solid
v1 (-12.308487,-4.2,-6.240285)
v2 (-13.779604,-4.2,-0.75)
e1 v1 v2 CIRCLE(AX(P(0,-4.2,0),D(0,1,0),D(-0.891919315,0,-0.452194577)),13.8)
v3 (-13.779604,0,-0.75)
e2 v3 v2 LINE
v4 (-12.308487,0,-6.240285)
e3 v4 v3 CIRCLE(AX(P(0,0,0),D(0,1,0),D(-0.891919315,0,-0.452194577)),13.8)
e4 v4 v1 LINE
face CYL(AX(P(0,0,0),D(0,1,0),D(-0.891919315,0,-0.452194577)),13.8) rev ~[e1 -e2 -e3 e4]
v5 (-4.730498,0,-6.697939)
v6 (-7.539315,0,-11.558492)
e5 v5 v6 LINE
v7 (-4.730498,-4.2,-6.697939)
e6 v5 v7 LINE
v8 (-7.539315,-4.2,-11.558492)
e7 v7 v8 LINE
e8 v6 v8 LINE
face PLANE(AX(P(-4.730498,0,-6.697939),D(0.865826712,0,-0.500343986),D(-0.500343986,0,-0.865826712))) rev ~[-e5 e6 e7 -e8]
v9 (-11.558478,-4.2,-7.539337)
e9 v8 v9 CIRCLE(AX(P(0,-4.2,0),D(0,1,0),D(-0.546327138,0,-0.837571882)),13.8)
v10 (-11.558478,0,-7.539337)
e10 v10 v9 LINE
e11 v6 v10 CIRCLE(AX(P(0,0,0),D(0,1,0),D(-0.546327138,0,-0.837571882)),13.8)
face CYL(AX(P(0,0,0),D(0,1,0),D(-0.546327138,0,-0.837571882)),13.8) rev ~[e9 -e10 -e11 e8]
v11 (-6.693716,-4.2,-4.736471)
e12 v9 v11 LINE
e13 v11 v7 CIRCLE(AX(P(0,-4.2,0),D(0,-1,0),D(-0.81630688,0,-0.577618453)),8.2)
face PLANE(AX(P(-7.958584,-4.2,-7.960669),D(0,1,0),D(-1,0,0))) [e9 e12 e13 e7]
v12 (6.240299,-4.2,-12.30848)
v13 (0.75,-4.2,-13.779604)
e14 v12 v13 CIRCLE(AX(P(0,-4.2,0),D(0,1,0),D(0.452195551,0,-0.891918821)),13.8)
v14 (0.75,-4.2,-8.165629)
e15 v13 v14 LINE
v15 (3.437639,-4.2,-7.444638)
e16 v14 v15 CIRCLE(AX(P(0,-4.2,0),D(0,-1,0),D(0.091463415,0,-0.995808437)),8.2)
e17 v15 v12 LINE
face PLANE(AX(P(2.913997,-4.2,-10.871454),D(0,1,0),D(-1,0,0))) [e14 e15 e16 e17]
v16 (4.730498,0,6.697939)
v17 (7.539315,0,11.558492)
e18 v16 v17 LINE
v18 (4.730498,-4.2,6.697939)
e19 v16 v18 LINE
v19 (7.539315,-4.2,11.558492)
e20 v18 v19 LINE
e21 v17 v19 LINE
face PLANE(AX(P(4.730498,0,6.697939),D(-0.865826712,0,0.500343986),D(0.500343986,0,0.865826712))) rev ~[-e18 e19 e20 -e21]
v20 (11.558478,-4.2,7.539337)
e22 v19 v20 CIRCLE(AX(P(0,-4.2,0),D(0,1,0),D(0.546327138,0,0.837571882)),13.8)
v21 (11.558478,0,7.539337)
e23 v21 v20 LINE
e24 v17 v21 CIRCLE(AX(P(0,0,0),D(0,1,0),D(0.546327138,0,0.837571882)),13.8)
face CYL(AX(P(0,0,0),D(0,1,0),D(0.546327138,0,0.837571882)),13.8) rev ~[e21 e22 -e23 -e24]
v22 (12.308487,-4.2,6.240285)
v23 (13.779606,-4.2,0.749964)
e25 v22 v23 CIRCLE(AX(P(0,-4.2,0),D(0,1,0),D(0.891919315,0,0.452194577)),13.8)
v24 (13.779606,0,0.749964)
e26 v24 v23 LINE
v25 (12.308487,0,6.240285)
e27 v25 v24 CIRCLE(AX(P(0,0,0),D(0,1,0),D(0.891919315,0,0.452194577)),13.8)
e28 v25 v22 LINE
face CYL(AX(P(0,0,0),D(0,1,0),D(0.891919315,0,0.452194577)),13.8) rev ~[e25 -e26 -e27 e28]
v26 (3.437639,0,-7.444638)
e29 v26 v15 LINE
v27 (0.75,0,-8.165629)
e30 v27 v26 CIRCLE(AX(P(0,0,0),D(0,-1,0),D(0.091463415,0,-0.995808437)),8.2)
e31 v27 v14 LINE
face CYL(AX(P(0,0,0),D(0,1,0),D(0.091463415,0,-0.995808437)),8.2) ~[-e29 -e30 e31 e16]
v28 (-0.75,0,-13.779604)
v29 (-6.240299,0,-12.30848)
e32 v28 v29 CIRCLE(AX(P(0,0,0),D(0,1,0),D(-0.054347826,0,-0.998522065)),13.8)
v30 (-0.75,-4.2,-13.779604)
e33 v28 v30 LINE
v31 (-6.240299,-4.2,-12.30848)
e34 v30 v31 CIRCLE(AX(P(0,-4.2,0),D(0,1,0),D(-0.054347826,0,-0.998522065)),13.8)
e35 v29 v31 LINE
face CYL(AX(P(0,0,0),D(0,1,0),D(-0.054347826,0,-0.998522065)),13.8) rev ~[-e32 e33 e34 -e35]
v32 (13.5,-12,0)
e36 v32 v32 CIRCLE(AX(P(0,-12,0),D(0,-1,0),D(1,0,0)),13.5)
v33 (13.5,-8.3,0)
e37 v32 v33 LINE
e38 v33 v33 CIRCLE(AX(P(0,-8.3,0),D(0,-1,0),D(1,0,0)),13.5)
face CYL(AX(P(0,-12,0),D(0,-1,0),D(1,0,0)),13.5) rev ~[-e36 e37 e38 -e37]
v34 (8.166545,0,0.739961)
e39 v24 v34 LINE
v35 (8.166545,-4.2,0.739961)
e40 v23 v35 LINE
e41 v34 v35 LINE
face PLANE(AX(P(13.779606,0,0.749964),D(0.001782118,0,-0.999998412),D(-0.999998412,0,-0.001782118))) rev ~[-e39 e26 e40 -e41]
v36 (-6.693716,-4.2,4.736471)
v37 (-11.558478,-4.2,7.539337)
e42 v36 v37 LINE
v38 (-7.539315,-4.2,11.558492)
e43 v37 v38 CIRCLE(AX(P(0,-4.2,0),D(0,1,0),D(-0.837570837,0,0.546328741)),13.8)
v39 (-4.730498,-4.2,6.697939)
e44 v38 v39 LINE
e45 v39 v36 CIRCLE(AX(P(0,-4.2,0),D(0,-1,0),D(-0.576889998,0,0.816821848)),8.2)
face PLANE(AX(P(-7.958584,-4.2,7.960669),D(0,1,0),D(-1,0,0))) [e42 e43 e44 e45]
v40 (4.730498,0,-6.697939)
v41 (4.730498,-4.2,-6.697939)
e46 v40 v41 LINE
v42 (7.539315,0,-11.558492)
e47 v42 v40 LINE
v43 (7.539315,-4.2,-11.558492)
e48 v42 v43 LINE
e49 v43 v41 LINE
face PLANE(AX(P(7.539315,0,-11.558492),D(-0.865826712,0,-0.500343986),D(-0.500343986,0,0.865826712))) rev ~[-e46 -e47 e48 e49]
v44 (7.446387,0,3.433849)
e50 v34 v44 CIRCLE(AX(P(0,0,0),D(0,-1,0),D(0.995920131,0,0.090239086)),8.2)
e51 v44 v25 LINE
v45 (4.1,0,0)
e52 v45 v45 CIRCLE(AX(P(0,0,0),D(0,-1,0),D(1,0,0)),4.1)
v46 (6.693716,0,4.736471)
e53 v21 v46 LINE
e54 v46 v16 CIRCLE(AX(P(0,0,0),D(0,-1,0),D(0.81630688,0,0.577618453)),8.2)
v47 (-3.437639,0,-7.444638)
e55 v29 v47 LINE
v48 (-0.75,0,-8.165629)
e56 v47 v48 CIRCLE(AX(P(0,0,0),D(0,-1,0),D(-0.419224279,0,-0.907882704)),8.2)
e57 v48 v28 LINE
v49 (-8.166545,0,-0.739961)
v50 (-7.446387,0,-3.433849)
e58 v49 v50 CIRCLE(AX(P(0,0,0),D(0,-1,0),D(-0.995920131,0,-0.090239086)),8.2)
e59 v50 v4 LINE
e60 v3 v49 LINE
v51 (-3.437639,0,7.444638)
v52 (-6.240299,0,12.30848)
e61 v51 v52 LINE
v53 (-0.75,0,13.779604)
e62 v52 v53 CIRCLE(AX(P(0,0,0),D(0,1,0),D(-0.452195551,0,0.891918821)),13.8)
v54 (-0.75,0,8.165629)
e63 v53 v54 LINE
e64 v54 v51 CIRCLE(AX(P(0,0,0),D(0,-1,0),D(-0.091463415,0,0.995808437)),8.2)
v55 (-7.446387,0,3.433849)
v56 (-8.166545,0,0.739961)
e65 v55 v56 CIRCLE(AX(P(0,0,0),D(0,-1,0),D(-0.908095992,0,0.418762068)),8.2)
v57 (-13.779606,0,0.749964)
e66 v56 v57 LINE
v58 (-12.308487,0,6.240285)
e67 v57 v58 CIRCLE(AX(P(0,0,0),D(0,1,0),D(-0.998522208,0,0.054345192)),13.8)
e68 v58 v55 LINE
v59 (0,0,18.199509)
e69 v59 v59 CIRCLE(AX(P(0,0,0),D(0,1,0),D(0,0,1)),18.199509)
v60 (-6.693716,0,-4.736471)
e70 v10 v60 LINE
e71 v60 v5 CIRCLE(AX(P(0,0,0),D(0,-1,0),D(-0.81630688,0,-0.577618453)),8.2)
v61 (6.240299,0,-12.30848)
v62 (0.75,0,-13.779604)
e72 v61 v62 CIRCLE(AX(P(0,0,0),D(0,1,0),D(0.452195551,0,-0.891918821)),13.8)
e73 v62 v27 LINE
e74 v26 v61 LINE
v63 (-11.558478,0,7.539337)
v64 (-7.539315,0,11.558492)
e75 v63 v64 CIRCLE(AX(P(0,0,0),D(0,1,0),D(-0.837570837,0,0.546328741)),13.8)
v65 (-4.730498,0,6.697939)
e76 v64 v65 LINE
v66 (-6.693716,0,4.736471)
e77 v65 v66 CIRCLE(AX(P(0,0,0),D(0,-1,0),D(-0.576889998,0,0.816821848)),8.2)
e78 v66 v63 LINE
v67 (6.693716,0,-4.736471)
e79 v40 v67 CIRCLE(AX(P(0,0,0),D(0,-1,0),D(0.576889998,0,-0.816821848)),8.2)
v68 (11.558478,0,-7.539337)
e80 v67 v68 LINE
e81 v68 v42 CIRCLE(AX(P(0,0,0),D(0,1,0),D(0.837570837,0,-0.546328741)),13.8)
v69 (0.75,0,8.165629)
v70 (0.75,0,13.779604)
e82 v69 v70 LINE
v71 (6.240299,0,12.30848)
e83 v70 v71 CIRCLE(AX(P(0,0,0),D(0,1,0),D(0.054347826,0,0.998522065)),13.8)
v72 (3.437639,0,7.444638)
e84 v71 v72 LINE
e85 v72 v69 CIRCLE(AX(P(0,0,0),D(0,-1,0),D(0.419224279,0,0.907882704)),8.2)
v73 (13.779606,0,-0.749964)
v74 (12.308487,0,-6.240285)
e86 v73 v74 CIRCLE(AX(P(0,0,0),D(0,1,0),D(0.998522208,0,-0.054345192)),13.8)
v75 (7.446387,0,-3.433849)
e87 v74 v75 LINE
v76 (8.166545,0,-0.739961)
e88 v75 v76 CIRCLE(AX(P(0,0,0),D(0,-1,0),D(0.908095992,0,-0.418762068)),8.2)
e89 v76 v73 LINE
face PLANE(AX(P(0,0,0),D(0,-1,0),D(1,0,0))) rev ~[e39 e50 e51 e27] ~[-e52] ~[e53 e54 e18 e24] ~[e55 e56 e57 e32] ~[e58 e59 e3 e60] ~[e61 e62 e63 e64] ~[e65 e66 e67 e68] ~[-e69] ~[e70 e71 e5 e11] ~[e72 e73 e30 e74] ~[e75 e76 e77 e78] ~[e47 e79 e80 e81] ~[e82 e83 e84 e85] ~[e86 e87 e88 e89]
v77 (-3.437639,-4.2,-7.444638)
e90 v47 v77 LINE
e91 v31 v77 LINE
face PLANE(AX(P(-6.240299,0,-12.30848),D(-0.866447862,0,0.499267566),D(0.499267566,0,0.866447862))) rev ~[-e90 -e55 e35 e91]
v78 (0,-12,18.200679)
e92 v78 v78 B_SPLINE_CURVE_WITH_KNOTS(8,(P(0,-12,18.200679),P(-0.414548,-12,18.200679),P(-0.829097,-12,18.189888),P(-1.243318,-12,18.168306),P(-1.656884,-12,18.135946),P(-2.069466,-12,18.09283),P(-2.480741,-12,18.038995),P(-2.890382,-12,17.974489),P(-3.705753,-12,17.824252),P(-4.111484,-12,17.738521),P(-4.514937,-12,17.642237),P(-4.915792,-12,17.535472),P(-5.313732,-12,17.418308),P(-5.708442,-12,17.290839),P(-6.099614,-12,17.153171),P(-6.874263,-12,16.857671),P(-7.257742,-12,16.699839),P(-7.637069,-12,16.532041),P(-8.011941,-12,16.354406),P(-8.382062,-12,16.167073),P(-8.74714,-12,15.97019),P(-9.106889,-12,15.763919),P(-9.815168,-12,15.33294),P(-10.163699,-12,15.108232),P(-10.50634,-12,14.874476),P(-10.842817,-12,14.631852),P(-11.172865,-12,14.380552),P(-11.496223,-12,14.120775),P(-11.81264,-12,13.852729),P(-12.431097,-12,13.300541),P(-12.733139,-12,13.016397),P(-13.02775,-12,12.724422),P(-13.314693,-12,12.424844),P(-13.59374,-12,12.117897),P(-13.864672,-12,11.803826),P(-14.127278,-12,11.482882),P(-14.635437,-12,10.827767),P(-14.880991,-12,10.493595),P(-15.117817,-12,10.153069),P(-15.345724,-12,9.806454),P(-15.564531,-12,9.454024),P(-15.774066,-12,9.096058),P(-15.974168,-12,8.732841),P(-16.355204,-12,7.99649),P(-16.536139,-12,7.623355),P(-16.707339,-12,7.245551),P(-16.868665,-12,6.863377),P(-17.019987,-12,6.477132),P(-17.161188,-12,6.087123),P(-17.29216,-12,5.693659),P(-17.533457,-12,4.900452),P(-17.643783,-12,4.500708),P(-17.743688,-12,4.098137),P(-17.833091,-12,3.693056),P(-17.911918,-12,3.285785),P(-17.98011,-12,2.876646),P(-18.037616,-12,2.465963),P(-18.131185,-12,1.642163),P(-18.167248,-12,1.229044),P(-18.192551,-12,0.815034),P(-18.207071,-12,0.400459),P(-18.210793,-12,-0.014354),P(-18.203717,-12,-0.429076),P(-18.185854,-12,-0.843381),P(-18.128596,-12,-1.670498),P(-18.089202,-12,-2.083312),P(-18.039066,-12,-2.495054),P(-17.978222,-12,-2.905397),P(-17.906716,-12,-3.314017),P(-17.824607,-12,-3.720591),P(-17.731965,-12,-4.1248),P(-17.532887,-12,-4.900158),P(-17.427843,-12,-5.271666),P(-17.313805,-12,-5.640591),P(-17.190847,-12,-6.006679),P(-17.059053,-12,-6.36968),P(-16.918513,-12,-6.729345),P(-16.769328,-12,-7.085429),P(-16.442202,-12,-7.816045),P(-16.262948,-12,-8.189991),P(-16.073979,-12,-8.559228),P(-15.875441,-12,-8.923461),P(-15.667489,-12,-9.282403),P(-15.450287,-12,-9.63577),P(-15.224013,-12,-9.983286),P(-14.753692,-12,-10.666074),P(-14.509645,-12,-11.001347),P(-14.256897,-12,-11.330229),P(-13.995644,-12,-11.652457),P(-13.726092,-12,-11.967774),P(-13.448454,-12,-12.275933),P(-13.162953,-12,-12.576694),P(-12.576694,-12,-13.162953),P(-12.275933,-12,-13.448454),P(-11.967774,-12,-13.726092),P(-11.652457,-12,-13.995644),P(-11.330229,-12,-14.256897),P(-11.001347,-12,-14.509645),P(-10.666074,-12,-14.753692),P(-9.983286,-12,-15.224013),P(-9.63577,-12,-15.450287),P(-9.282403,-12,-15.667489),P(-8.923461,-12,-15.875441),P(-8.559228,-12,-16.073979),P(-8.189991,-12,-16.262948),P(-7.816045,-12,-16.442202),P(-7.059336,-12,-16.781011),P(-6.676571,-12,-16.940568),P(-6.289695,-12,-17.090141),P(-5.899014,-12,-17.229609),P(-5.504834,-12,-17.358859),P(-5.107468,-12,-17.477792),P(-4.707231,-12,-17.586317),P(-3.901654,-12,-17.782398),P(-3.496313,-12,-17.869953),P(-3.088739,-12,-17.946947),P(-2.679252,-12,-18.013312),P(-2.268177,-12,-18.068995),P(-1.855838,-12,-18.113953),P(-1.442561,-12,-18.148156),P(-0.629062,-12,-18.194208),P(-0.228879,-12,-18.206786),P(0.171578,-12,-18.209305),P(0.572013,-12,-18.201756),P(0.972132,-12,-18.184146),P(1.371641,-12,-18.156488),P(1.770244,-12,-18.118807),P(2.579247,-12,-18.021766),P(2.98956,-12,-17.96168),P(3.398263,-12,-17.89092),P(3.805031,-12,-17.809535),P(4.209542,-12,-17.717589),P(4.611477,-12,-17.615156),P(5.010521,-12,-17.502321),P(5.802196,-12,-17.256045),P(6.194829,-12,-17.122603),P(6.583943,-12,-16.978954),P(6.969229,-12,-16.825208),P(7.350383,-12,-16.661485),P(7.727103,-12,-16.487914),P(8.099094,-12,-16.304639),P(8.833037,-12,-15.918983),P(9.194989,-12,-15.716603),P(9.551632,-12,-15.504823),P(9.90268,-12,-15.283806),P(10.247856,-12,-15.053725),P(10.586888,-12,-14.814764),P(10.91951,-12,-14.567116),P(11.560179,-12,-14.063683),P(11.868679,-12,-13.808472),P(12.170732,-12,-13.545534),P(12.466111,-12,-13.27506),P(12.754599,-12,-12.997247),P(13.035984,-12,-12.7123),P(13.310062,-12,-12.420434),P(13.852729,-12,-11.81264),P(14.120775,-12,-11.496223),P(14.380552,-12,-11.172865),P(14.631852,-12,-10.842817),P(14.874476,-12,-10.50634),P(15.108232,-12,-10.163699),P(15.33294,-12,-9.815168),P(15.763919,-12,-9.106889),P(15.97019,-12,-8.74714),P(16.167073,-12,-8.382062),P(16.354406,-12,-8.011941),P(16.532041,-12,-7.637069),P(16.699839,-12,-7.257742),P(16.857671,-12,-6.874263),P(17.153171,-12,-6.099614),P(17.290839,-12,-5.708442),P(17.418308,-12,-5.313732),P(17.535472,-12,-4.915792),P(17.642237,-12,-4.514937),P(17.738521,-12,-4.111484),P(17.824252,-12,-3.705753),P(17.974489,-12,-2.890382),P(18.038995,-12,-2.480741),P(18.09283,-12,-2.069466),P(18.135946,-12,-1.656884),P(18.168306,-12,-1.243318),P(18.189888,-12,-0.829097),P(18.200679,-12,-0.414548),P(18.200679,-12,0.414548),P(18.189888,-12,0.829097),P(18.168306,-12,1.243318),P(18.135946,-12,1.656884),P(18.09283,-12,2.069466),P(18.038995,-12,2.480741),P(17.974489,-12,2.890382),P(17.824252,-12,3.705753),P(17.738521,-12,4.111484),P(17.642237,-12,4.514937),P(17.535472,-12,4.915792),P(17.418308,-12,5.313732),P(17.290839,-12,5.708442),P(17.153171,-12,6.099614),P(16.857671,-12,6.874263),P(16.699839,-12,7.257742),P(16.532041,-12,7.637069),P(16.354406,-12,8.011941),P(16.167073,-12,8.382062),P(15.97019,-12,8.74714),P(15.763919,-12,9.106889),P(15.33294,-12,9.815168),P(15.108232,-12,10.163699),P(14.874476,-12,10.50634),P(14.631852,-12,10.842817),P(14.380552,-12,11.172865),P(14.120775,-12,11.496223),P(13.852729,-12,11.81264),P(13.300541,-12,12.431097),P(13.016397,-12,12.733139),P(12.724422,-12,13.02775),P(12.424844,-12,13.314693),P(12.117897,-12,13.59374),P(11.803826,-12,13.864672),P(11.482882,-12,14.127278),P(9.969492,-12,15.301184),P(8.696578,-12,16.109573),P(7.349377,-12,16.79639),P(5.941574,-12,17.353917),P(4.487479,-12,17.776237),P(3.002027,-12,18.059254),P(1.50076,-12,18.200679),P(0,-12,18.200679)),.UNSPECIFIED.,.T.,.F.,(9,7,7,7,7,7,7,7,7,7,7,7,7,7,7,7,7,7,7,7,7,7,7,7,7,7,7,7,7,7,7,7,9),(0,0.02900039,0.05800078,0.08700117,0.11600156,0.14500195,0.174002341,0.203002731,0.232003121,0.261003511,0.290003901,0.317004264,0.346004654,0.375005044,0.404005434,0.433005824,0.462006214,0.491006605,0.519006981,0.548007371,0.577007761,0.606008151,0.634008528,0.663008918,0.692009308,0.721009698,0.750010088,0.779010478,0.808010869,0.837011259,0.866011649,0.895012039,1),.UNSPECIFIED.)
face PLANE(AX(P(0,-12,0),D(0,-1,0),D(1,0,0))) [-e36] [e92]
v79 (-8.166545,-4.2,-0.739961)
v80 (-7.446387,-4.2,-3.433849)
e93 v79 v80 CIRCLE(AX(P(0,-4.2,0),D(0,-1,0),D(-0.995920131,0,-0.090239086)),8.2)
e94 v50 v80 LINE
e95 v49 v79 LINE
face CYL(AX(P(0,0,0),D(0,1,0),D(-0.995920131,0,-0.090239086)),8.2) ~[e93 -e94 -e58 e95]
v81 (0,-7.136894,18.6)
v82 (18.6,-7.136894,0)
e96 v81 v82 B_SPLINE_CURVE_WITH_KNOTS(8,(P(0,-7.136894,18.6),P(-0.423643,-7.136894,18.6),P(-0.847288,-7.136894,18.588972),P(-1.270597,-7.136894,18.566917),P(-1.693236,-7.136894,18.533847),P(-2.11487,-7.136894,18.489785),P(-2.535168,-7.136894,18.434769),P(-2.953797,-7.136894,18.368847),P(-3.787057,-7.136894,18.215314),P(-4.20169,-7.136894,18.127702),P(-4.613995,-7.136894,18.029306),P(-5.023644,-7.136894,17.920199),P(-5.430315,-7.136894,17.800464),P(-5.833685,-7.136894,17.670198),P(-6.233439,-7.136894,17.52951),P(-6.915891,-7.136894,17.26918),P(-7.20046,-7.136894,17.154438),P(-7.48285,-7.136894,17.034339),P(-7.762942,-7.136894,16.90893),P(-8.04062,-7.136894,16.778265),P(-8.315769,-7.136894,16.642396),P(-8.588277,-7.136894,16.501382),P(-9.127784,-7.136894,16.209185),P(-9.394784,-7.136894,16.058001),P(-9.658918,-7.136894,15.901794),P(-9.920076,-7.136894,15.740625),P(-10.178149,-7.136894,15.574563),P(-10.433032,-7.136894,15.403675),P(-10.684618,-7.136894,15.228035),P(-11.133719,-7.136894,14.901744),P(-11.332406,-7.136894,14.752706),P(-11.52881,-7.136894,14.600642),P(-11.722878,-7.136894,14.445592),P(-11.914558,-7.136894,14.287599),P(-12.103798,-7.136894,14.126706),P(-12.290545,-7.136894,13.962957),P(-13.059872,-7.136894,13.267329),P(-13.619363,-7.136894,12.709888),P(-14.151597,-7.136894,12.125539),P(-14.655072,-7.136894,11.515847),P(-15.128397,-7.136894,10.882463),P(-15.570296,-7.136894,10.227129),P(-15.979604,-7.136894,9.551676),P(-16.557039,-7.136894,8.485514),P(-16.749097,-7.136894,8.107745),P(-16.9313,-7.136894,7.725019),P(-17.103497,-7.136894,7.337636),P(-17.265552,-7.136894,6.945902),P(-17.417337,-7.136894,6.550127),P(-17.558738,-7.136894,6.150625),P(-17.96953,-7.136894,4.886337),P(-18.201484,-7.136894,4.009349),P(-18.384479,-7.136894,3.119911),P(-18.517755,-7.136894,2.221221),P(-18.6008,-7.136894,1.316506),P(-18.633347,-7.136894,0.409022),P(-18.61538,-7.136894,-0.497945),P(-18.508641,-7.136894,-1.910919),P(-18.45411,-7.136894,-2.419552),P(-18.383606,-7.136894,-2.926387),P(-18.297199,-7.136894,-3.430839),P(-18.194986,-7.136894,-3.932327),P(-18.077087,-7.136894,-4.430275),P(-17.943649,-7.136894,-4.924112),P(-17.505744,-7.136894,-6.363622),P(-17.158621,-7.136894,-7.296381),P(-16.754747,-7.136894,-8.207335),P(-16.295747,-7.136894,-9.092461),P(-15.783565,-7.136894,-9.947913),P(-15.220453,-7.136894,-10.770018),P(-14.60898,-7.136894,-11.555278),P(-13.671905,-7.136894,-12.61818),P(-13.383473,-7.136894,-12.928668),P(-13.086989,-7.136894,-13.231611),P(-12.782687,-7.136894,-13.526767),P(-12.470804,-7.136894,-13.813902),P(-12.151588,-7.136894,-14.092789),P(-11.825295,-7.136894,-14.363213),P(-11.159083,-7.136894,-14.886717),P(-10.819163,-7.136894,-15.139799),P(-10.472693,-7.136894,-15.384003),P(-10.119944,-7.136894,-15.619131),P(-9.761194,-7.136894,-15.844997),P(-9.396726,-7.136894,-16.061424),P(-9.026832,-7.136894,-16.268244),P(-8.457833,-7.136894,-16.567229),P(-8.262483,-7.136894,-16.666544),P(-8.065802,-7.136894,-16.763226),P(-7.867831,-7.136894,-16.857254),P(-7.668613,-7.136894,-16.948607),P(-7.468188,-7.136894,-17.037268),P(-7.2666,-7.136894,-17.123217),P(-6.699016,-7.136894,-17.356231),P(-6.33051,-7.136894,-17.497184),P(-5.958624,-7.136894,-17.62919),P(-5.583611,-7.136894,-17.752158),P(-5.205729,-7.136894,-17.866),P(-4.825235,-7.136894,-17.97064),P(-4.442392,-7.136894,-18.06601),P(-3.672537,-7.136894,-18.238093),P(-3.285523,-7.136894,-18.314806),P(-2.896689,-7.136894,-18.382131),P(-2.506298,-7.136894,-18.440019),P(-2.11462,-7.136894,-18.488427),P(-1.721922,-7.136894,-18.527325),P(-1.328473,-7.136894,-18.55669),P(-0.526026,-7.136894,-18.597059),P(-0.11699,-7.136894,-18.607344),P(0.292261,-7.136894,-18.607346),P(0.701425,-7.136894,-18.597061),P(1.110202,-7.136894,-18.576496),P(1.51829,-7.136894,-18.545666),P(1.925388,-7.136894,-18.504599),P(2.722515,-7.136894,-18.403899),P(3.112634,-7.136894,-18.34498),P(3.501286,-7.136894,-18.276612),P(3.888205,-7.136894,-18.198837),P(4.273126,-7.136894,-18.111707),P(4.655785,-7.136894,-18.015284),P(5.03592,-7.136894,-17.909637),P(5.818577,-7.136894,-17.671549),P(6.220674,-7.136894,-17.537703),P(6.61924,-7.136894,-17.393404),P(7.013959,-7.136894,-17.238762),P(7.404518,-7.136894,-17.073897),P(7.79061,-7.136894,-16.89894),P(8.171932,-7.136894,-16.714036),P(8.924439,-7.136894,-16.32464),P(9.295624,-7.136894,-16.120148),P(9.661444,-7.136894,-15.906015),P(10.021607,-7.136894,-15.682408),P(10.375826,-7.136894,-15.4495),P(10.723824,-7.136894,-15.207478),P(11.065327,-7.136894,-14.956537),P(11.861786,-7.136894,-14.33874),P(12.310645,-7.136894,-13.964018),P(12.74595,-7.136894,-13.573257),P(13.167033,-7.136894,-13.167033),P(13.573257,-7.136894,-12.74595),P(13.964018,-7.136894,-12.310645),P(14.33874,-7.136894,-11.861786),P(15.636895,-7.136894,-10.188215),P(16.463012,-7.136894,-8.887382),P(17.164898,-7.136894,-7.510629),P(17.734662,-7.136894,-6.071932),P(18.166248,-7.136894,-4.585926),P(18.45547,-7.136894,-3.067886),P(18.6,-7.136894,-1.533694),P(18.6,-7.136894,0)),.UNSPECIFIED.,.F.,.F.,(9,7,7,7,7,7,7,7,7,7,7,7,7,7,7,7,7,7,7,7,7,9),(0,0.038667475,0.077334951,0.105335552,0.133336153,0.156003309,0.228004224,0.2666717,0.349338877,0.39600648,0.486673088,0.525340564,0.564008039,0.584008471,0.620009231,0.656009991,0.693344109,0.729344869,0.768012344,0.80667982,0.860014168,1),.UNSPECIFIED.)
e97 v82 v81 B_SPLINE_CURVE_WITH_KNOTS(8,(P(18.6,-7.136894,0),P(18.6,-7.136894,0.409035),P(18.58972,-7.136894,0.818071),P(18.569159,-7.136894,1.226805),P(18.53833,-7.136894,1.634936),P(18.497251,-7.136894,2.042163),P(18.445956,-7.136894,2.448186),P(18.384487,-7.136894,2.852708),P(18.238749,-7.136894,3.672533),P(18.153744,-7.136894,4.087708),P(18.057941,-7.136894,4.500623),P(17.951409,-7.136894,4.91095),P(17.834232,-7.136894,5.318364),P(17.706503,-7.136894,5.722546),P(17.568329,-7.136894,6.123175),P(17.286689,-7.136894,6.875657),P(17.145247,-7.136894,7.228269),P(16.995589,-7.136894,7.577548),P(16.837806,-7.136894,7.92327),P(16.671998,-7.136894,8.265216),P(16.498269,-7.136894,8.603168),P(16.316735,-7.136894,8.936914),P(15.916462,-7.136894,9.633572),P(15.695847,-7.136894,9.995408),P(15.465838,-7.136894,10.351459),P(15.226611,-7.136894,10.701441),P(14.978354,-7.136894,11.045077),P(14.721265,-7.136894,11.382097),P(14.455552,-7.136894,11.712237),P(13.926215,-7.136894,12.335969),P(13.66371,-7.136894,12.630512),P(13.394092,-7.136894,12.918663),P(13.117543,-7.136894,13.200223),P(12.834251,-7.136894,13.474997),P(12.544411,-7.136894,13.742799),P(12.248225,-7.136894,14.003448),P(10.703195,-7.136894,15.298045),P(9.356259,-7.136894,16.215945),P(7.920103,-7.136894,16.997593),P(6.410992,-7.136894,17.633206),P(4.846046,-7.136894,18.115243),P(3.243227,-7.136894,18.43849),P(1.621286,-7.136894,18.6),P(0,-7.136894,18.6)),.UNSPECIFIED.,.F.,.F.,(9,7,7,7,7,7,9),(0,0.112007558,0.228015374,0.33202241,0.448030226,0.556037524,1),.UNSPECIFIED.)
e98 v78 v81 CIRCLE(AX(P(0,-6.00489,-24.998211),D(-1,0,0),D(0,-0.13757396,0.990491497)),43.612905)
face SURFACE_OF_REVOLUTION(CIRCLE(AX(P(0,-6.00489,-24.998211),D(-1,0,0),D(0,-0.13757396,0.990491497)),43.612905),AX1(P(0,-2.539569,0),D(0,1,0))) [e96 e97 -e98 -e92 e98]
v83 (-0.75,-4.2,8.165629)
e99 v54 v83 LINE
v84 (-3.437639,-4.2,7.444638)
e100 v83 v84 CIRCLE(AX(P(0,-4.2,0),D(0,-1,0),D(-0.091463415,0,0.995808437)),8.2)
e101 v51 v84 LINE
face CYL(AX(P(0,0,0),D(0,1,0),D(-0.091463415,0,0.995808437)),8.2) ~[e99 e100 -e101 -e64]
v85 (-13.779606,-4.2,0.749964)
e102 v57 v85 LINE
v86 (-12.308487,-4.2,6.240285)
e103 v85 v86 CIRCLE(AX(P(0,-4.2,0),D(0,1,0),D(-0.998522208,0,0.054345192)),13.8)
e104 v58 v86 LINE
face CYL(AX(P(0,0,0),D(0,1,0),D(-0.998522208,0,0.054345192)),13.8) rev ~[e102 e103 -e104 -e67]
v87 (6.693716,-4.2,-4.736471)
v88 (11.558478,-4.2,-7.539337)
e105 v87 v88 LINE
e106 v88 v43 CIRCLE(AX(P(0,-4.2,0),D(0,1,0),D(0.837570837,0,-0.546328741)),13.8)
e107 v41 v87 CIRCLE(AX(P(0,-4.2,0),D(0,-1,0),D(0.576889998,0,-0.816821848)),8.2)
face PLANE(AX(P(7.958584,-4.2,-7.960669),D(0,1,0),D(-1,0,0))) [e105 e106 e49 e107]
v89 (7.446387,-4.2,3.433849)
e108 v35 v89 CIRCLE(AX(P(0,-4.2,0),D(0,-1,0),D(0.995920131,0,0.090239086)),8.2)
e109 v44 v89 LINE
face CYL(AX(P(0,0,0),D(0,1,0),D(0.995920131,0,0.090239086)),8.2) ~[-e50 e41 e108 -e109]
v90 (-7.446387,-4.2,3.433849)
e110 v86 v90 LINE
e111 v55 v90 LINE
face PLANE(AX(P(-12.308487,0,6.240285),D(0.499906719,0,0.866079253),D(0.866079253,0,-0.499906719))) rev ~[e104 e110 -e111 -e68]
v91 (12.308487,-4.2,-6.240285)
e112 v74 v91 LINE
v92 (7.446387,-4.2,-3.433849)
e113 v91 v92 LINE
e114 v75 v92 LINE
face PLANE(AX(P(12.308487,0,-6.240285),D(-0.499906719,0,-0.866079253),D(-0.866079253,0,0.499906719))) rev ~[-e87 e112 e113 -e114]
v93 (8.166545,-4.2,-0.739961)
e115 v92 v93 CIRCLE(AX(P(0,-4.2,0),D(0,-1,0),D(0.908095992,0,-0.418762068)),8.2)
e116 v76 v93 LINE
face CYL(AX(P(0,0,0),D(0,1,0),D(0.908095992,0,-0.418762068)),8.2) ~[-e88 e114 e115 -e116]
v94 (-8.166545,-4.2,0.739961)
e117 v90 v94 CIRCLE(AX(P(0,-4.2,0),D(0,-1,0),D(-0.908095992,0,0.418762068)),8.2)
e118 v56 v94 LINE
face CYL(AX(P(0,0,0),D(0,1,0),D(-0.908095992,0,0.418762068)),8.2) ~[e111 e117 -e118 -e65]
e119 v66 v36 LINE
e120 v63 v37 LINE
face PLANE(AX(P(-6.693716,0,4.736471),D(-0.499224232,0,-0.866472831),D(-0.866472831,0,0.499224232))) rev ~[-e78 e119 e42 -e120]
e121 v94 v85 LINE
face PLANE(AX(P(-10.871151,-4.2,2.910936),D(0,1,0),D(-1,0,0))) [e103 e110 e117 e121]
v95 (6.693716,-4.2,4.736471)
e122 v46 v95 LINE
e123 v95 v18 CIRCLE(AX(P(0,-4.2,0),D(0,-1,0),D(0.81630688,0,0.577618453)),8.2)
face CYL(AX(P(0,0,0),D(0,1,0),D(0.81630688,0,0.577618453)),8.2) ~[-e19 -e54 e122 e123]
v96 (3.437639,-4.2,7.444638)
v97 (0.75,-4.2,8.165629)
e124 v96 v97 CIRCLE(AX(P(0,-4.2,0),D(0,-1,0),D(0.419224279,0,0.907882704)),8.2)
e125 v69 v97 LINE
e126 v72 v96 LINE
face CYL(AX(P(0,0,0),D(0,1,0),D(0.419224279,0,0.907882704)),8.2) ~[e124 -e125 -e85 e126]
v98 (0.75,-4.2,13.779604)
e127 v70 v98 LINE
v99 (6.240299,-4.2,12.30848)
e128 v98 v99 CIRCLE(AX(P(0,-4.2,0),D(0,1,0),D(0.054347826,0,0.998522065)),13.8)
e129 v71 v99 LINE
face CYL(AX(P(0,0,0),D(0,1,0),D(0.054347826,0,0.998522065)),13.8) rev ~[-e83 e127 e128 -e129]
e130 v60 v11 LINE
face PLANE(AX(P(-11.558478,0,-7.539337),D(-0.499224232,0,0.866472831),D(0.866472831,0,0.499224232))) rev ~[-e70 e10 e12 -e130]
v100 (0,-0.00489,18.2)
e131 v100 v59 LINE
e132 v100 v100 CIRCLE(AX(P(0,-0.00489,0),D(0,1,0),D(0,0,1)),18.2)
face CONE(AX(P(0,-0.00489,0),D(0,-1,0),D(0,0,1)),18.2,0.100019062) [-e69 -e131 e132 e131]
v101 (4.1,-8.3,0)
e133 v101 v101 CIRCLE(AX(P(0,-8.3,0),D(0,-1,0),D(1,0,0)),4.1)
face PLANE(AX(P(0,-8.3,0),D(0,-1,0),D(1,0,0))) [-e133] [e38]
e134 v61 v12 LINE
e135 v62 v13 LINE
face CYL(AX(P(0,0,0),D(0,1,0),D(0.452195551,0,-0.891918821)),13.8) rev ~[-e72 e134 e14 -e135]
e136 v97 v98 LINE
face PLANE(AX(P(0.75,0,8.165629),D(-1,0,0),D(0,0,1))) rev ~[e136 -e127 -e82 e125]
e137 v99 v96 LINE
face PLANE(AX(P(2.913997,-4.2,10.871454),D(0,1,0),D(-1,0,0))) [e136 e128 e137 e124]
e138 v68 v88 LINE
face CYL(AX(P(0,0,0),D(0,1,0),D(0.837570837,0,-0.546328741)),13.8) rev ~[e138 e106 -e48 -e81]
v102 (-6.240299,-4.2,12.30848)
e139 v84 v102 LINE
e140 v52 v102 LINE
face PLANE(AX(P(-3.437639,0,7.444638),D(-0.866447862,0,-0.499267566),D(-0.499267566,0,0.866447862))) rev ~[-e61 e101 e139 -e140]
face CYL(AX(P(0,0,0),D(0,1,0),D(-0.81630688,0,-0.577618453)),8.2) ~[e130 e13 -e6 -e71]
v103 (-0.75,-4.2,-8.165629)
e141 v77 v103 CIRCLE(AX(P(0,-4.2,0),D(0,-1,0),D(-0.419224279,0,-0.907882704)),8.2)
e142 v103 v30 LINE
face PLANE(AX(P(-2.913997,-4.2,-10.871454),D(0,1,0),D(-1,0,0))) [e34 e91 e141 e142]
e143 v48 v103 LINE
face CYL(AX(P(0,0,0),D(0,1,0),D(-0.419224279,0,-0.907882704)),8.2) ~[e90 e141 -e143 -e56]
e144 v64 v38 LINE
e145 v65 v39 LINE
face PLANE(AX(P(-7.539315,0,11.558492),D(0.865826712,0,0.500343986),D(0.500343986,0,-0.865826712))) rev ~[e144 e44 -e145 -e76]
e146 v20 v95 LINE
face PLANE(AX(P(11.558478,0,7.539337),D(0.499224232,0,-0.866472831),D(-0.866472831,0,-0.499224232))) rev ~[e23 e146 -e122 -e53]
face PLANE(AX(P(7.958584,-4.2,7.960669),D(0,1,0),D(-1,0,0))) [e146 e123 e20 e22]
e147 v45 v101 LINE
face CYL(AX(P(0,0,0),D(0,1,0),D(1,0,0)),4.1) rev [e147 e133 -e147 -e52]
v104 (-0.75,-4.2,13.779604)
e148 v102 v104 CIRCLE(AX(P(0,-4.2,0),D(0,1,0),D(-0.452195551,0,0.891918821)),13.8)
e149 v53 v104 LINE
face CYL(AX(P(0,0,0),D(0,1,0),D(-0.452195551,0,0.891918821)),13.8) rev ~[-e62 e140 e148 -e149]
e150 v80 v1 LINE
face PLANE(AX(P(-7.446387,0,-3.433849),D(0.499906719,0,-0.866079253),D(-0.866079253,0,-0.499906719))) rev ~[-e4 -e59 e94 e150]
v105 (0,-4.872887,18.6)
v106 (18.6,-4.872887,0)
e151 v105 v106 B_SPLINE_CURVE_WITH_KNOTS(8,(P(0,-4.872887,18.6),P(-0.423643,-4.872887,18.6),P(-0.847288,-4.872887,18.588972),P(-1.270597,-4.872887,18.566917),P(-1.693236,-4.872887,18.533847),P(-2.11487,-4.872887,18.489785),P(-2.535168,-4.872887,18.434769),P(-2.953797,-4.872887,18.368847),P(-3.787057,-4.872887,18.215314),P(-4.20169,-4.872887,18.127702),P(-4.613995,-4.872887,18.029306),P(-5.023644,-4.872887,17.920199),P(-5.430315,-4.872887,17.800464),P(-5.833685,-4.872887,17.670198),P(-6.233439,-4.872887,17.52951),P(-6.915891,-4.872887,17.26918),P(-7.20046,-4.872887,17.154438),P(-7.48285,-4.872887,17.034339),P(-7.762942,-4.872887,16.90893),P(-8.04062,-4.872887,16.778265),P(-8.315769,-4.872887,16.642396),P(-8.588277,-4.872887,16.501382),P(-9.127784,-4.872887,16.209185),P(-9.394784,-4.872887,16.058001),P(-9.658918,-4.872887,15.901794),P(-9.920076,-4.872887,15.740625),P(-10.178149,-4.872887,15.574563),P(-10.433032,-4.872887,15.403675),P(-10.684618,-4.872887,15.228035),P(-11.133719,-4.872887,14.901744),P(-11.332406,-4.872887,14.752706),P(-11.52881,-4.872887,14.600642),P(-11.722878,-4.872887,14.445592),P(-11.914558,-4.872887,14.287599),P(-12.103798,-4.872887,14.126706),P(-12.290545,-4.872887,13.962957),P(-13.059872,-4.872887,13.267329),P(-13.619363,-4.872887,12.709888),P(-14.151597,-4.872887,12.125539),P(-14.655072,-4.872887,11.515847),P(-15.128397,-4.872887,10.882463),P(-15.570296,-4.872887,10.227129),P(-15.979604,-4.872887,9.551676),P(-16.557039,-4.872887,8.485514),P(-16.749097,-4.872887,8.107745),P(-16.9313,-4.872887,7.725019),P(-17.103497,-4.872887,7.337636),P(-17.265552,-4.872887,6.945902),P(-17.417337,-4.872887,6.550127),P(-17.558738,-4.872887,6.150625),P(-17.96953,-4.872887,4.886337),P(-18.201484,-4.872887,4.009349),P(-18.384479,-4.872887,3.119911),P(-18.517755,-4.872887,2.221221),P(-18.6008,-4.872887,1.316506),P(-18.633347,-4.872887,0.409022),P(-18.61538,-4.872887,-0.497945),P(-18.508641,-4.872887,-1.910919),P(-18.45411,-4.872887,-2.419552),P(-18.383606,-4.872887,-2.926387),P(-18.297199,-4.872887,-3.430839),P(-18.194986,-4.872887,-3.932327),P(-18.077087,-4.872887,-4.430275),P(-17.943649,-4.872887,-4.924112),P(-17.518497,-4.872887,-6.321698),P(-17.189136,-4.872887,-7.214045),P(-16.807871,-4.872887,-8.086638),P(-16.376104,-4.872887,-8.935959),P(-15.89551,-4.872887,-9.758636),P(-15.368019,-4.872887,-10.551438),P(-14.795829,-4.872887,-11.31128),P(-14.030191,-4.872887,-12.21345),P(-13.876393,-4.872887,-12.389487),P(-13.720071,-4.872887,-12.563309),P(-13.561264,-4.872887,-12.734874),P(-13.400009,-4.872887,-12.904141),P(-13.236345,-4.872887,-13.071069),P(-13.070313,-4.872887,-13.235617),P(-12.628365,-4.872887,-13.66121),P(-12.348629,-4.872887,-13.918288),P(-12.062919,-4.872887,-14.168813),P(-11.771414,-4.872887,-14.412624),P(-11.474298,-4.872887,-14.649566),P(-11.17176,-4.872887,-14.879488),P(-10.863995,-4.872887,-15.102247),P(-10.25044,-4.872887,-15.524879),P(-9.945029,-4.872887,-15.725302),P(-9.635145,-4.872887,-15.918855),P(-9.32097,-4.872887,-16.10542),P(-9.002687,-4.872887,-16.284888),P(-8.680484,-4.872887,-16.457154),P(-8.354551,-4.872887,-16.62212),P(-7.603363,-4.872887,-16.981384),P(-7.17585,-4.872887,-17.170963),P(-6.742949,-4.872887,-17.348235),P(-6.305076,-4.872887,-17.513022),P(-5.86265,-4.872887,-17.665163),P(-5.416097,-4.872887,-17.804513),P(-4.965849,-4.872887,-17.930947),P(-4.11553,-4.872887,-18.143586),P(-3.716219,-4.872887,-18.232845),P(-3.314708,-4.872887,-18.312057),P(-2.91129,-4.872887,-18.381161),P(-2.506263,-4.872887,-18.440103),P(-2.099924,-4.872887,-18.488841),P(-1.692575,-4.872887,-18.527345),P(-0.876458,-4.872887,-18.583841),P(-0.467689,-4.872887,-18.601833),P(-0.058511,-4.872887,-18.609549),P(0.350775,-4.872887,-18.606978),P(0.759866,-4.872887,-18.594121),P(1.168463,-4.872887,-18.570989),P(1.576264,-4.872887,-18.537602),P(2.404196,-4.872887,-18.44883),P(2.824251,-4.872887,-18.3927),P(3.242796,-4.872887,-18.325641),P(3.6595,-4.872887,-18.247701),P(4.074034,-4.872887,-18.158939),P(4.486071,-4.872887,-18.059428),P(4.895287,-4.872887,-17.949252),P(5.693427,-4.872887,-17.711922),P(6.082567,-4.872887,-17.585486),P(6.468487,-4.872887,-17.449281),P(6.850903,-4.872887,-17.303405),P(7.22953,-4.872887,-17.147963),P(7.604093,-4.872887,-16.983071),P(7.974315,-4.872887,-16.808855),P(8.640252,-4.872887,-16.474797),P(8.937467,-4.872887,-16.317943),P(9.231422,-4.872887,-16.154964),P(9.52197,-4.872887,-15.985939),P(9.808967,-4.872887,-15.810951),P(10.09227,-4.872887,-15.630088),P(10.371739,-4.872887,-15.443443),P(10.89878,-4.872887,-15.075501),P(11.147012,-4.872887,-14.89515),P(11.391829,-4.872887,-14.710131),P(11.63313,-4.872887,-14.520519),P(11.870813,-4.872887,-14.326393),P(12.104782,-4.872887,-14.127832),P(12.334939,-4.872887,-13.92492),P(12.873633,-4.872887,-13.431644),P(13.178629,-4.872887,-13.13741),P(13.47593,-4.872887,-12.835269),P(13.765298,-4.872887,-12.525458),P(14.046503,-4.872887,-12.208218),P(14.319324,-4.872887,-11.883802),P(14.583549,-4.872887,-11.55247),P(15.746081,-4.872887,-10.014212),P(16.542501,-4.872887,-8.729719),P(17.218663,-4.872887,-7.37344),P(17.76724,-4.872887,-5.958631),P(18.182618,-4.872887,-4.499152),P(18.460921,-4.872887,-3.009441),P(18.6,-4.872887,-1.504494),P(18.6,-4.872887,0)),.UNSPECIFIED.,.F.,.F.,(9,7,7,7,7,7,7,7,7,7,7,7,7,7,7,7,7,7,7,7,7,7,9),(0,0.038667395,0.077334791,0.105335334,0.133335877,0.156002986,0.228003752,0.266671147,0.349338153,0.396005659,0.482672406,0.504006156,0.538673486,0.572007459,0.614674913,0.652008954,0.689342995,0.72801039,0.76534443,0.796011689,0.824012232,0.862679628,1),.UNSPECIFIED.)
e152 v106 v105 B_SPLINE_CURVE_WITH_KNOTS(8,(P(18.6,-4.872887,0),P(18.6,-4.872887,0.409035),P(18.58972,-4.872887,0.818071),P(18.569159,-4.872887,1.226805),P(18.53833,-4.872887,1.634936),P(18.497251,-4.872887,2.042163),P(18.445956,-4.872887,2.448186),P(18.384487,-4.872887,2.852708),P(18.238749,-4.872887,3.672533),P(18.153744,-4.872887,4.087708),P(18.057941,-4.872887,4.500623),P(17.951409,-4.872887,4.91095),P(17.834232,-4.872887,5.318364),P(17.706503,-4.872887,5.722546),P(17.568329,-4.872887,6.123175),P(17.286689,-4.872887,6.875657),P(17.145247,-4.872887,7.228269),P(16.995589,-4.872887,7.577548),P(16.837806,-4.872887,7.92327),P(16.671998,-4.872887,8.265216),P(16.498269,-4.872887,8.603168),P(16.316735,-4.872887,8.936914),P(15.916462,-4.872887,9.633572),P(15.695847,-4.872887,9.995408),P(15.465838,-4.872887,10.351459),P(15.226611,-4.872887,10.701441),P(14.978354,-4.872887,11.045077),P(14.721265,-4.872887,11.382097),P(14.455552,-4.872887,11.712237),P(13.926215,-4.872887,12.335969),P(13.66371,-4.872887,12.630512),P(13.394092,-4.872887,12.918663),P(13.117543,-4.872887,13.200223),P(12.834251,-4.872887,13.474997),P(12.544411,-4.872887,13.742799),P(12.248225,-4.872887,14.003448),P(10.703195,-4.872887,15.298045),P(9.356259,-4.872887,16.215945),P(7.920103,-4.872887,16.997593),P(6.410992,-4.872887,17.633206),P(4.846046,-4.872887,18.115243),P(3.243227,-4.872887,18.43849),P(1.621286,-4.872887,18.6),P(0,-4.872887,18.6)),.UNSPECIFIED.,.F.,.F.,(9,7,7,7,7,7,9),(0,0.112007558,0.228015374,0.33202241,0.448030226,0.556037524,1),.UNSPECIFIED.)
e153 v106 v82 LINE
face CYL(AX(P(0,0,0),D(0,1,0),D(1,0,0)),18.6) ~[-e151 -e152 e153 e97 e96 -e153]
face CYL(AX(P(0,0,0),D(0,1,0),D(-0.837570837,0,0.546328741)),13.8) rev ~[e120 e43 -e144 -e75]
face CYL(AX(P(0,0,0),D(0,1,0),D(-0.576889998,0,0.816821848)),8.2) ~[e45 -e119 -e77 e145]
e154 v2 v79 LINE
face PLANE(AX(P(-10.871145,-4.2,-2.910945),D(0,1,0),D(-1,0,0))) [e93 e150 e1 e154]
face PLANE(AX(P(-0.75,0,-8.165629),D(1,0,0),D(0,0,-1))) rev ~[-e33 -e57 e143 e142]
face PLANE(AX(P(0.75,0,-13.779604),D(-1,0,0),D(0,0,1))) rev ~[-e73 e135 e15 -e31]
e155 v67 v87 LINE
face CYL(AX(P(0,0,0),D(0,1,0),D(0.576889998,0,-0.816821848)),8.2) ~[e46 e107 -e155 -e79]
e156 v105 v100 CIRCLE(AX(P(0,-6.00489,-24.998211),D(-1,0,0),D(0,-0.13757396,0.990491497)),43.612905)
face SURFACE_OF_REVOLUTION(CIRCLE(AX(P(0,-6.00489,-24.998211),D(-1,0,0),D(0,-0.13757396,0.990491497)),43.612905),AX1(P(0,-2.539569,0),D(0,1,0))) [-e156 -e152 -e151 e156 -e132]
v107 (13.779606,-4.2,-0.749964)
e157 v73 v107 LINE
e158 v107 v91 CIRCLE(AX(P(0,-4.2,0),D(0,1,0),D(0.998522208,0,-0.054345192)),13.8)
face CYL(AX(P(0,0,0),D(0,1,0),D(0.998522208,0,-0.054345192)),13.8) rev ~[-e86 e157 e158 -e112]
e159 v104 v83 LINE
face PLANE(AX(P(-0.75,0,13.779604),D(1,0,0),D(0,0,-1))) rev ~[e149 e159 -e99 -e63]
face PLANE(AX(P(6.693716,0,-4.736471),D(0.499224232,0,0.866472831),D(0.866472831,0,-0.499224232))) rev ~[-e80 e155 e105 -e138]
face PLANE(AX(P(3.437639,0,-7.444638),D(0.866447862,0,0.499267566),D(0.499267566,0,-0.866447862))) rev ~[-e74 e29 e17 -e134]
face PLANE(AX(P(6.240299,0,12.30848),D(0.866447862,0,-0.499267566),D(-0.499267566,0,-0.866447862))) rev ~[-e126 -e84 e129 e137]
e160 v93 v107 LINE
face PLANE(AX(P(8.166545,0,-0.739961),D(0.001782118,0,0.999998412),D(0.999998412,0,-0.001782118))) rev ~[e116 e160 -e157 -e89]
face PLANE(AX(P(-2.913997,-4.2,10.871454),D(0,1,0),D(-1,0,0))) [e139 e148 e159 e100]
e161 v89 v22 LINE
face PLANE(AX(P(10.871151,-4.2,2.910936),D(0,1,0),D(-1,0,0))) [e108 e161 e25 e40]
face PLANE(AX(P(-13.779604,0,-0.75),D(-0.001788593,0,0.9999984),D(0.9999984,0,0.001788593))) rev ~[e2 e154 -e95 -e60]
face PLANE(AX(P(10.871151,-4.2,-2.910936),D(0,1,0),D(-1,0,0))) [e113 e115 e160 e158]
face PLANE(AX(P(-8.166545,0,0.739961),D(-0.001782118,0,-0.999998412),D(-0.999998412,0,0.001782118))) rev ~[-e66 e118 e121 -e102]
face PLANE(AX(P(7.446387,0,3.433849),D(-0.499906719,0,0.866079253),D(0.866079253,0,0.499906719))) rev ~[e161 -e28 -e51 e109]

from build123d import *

# Parameters (mm, degrees)
F0_R     = 18.6
F0_R_2   = 4.1
F1_DEPTH = 12
F2_R     = 13.5
F2_R_2   = 4.1
F3_DEPTH = 3.7
F5_DEPTH = 4.2


# Not quite as in the source:
# - ends of sketch curves that miss each other by under 0.0002 mm in the source are joined


with BuildPart() as f1:
    # F0 (on Front) → F1 (new body)
    with BuildSketch(Plane.XZ):
        Circle(F0_R)
        Circle(F0_R_2, mode=Mode.SUBTRACT)
    extrude(amount=F1_DEPTH)

    # F2 (on face) → F3 (cut)
    with BuildSketch(Plane.XZ.offset(12)):
        Circle(F2_R)
        Circle(F2_R_2, mode=Mode.SUBTRACT)
    extrude(amount=-F3_DEPTH, mode=Mode.SUBTRACT)

    # F4 (on face) → F5 (cut)
    with BuildSketch(Plane(origin=(0, 0, 0), x_dir=(-1, 0, 0), z_dir=(0, 1, 0))):
        with BuildLine():
            Line((-7.4463871349, 3.4338489537), (-12.3084865507, 6.2402851562))
            ThreePointArc((-12.3084865507, 6.2402851562), (-13.3297808283, 3.5716863063), (-13.7796064717, 0.7499636563))
            Line((-13.7796064717, 0.7499636563), (-8.1665450744, 0.7399605041))
            ThreePointArc((-8.1665450744, 0.7399605041), (-7.9218161925, 2.1177412996), (-7.4463871349, 3.4338489537))
        make_face()
        with BuildLine():
            Line((-0.75, 8.1656291858), (-0.75, 13.7796044936))
            ThreePointArc((-0.75, 13.7796044936), (-3.5717111631, 13.3297741679), (-6.2402985973, 12.3084797362))
            Line((-6.2402985973, 12.3084797362), (-3.4376390894, 7.4446381706))
            ThreePointArc((-3.4376390894, 7.4446381706), (-2.1246263899, 7.9199723928), (-0.75, 8.1656291858))
        make_face()
        with BuildLine():
            ThreePointArc((6.2402985973, 12.3084797362), (3.5717111631, 13.3297741679), (0.75, 13.7796044936))
            Line((0.75, 13.7796044936), (0.75, 8.1656291858))
            ThreePointArc((0.75, 8.1656291858), (2.1246263899, 7.9199723928), (3.4376390894, 7.4446381706))
            Line((3.4376390894, 7.4446381706), (6.2402985973, 12.3084797362))
        make_face()
        with BuildLine():
            Line((7.5393145037, 11.5584919784), (4.7304979814, 6.6979391493))
            ThreePointArc((4.7304979814, 6.6979391493), (5.7956887156, 5.8008613423), (6.6937164195, 4.7364713126))
            Line((6.6937164195, 4.7364713126), (11.5584775515, 7.5393366214))
            ThreePointArc((11.5584775515, 7.5393366214), (9.7580642441, 9.7580829166), (7.5393145037, 11.5584919784))
        make_face()
        with BuildLine():
            Line((12.3084865507, 6.2402851562), (7.4463871349, 3.4338489537))
            ThreePointArc((7.4463871349, 3.4338489537), (7.9218161925, 2.1177412996), (8.1665450744, 0.7399605041))
            Line((8.1665450744, 0.7399605041), (13.7796064717, 0.7499636563))
            ThreePointArc((13.7796064717, 0.7499636563), (13.3297808283, 3.5716863063), (12.3084865507, 6.2402851562))
        make_face()
        with BuildLine():
            ThreePointArc((-6.6937164195, 4.7364713126), (-5.7956887156, 5.8008613423), (-4.7304979814, 6.6979391493))
            Line((-4.7304979814, 6.6979391493), (-7.5393145037, 11.5584919784))
            ThreePointArc((-7.5393145037, 11.5584919784), (-9.7580642441, 9.7580829166), (-11.5584775515, 7.5393366214))
            Line((-11.5584775515, 7.5393366214), (-6.6937164195, 4.7364713126))
        make_face()
        with BuildLine():
            Line((-8.1665450744, -0.7399605041), (-13.7796064717, -0.7499636563))
            ThreePointArc((-13.7796064717, -0.7499636563), (-13.3297808283, -3.5716863063), (-12.3084865507, -6.2402851562))
            Line((-12.3084865507, -6.2402851562), (-7.4463871349, -3.4338489537))
            ThreePointArc((-7.4463871349, -3.4338489537), (-7.9218161925, -2.1177412996), (-8.1665450744, -0.7399605041))
        make_face()
        with BuildLine():
            ThreePointArc((-4.7304979814, -6.6979391493), (-5.7956887156, -5.8008613423), (-6.6937164195, -4.7364713126))
            Line((-6.6937164195, -4.7364713126), (-11.5584775515, -7.5393366214))
            ThreePointArc((-11.5584775515, -7.5393366214), (-9.7580642441, -9.7580829166), (-7.5393145037, -11.5584919784))
            Line((-7.5393145037, -11.5584919784), (-4.7304979814, -6.6979391493))
        make_face()
        with BuildLine():
            ThreePointArc((-0.75, -8.1656291858), (-2.1246263899, -7.9199723928), (-3.4376390894, -7.4446381706))
            Line((-3.4376390894, -7.4446381706), (-6.2402985973, -12.3084797362))
            ThreePointArc((-6.2402985973, -12.3084797362), (-3.5717111631, -13.3297741679), (-0.75, -13.7796044936))
            Line((-0.75, -13.7796044936), (-0.75, -8.1656291858))
        make_face()
        with BuildLine():
            Line((0.75, -8.1656291858), (0.75, -13.7796044936))
            ThreePointArc((0.75, -13.7796044936), (3.5717111631, -13.3297741679), (6.2402985973, -12.3084797362))
            Line((6.2402985973, -12.3084797362), (3.4376390894, -7.4446381706))
            ThreePointArc((3.4376390894, -7.4446381706), (2.1246263899, -7.9199723928), (0.75, -8.1656291858))
        make_face()
        with BuildLine():
            ThreePointArc((6.6937164195, -4.7364713126), (5.7956887156, -5.8008613423), (4.7304979814, -6.6979391493))
            Line((4.7304979814, -6.6979391493), (7.5393145037, -11.5584919784))
            ThreePointArc((7.5393145037, -11.5584919784), (9.7580642441, -9.7580829166), (11.5584775515, -7.5393366214))
            Line((11.5584775515, -7.5393366214), (6.6937164195, -4.7364713126))
        make_face()
        with BuildLine():
            ThreePointArc((8.1665450744, -0.7399605041), (7.9218161925, -2.1177412996), (7.4463871349, -3.4338489537))
            Line((7.4463871349, -3.4338489537), (12.3084865507, -6.2402851562))
            ThreePointArc((12.3084865507, -6.2402851562), (13.3297761181, -3.5717038849), (13.7796044936, -0.75))
            Line((13.7796044936, -0.75), (8.1665450744, -0.7399605041))
        make_face()
    extrude(amount=-F5_DEPTH, mode=Mode.SUBTRACT)

    # F6 (on Right) → F7 (revolve, cut)
    with BuildSketch(Plane.YZ):
        with BuildLine():
            ThreePointArc((-12.0048904791, 18.2), (-6.0048904791, 18.6146934366), (-0.0048904791, 18.2))
            Line((-0.0048904791, 18.2), (0.3708341392, 18.1622945595))
            Line((0.3708341392, 18.1622945595), (0.3708341392, 18.6))
            Line((0.3708341392, 18.6), (0.3567633394, 19.1855213957))
            Line((0.3567633394, 19.1855213957), (-12.2980514625, 19.1855213957))
            Line((-12.2980514625, 19.1855213957), (-12.27635841, 18.5901094228))
            Line((-12.27635841, 18.5901094228), (-12.27635841, 18.1622945595))
            Line((-12.27635841, 18.1622945595), (-12.0048904791, 18.2))
        make_face()
    revolve(axis=Axis((0, -2.5395685887, 0), (0, 1, 0)), mode=Mode.SUBTRACT)


solid = f1.part
